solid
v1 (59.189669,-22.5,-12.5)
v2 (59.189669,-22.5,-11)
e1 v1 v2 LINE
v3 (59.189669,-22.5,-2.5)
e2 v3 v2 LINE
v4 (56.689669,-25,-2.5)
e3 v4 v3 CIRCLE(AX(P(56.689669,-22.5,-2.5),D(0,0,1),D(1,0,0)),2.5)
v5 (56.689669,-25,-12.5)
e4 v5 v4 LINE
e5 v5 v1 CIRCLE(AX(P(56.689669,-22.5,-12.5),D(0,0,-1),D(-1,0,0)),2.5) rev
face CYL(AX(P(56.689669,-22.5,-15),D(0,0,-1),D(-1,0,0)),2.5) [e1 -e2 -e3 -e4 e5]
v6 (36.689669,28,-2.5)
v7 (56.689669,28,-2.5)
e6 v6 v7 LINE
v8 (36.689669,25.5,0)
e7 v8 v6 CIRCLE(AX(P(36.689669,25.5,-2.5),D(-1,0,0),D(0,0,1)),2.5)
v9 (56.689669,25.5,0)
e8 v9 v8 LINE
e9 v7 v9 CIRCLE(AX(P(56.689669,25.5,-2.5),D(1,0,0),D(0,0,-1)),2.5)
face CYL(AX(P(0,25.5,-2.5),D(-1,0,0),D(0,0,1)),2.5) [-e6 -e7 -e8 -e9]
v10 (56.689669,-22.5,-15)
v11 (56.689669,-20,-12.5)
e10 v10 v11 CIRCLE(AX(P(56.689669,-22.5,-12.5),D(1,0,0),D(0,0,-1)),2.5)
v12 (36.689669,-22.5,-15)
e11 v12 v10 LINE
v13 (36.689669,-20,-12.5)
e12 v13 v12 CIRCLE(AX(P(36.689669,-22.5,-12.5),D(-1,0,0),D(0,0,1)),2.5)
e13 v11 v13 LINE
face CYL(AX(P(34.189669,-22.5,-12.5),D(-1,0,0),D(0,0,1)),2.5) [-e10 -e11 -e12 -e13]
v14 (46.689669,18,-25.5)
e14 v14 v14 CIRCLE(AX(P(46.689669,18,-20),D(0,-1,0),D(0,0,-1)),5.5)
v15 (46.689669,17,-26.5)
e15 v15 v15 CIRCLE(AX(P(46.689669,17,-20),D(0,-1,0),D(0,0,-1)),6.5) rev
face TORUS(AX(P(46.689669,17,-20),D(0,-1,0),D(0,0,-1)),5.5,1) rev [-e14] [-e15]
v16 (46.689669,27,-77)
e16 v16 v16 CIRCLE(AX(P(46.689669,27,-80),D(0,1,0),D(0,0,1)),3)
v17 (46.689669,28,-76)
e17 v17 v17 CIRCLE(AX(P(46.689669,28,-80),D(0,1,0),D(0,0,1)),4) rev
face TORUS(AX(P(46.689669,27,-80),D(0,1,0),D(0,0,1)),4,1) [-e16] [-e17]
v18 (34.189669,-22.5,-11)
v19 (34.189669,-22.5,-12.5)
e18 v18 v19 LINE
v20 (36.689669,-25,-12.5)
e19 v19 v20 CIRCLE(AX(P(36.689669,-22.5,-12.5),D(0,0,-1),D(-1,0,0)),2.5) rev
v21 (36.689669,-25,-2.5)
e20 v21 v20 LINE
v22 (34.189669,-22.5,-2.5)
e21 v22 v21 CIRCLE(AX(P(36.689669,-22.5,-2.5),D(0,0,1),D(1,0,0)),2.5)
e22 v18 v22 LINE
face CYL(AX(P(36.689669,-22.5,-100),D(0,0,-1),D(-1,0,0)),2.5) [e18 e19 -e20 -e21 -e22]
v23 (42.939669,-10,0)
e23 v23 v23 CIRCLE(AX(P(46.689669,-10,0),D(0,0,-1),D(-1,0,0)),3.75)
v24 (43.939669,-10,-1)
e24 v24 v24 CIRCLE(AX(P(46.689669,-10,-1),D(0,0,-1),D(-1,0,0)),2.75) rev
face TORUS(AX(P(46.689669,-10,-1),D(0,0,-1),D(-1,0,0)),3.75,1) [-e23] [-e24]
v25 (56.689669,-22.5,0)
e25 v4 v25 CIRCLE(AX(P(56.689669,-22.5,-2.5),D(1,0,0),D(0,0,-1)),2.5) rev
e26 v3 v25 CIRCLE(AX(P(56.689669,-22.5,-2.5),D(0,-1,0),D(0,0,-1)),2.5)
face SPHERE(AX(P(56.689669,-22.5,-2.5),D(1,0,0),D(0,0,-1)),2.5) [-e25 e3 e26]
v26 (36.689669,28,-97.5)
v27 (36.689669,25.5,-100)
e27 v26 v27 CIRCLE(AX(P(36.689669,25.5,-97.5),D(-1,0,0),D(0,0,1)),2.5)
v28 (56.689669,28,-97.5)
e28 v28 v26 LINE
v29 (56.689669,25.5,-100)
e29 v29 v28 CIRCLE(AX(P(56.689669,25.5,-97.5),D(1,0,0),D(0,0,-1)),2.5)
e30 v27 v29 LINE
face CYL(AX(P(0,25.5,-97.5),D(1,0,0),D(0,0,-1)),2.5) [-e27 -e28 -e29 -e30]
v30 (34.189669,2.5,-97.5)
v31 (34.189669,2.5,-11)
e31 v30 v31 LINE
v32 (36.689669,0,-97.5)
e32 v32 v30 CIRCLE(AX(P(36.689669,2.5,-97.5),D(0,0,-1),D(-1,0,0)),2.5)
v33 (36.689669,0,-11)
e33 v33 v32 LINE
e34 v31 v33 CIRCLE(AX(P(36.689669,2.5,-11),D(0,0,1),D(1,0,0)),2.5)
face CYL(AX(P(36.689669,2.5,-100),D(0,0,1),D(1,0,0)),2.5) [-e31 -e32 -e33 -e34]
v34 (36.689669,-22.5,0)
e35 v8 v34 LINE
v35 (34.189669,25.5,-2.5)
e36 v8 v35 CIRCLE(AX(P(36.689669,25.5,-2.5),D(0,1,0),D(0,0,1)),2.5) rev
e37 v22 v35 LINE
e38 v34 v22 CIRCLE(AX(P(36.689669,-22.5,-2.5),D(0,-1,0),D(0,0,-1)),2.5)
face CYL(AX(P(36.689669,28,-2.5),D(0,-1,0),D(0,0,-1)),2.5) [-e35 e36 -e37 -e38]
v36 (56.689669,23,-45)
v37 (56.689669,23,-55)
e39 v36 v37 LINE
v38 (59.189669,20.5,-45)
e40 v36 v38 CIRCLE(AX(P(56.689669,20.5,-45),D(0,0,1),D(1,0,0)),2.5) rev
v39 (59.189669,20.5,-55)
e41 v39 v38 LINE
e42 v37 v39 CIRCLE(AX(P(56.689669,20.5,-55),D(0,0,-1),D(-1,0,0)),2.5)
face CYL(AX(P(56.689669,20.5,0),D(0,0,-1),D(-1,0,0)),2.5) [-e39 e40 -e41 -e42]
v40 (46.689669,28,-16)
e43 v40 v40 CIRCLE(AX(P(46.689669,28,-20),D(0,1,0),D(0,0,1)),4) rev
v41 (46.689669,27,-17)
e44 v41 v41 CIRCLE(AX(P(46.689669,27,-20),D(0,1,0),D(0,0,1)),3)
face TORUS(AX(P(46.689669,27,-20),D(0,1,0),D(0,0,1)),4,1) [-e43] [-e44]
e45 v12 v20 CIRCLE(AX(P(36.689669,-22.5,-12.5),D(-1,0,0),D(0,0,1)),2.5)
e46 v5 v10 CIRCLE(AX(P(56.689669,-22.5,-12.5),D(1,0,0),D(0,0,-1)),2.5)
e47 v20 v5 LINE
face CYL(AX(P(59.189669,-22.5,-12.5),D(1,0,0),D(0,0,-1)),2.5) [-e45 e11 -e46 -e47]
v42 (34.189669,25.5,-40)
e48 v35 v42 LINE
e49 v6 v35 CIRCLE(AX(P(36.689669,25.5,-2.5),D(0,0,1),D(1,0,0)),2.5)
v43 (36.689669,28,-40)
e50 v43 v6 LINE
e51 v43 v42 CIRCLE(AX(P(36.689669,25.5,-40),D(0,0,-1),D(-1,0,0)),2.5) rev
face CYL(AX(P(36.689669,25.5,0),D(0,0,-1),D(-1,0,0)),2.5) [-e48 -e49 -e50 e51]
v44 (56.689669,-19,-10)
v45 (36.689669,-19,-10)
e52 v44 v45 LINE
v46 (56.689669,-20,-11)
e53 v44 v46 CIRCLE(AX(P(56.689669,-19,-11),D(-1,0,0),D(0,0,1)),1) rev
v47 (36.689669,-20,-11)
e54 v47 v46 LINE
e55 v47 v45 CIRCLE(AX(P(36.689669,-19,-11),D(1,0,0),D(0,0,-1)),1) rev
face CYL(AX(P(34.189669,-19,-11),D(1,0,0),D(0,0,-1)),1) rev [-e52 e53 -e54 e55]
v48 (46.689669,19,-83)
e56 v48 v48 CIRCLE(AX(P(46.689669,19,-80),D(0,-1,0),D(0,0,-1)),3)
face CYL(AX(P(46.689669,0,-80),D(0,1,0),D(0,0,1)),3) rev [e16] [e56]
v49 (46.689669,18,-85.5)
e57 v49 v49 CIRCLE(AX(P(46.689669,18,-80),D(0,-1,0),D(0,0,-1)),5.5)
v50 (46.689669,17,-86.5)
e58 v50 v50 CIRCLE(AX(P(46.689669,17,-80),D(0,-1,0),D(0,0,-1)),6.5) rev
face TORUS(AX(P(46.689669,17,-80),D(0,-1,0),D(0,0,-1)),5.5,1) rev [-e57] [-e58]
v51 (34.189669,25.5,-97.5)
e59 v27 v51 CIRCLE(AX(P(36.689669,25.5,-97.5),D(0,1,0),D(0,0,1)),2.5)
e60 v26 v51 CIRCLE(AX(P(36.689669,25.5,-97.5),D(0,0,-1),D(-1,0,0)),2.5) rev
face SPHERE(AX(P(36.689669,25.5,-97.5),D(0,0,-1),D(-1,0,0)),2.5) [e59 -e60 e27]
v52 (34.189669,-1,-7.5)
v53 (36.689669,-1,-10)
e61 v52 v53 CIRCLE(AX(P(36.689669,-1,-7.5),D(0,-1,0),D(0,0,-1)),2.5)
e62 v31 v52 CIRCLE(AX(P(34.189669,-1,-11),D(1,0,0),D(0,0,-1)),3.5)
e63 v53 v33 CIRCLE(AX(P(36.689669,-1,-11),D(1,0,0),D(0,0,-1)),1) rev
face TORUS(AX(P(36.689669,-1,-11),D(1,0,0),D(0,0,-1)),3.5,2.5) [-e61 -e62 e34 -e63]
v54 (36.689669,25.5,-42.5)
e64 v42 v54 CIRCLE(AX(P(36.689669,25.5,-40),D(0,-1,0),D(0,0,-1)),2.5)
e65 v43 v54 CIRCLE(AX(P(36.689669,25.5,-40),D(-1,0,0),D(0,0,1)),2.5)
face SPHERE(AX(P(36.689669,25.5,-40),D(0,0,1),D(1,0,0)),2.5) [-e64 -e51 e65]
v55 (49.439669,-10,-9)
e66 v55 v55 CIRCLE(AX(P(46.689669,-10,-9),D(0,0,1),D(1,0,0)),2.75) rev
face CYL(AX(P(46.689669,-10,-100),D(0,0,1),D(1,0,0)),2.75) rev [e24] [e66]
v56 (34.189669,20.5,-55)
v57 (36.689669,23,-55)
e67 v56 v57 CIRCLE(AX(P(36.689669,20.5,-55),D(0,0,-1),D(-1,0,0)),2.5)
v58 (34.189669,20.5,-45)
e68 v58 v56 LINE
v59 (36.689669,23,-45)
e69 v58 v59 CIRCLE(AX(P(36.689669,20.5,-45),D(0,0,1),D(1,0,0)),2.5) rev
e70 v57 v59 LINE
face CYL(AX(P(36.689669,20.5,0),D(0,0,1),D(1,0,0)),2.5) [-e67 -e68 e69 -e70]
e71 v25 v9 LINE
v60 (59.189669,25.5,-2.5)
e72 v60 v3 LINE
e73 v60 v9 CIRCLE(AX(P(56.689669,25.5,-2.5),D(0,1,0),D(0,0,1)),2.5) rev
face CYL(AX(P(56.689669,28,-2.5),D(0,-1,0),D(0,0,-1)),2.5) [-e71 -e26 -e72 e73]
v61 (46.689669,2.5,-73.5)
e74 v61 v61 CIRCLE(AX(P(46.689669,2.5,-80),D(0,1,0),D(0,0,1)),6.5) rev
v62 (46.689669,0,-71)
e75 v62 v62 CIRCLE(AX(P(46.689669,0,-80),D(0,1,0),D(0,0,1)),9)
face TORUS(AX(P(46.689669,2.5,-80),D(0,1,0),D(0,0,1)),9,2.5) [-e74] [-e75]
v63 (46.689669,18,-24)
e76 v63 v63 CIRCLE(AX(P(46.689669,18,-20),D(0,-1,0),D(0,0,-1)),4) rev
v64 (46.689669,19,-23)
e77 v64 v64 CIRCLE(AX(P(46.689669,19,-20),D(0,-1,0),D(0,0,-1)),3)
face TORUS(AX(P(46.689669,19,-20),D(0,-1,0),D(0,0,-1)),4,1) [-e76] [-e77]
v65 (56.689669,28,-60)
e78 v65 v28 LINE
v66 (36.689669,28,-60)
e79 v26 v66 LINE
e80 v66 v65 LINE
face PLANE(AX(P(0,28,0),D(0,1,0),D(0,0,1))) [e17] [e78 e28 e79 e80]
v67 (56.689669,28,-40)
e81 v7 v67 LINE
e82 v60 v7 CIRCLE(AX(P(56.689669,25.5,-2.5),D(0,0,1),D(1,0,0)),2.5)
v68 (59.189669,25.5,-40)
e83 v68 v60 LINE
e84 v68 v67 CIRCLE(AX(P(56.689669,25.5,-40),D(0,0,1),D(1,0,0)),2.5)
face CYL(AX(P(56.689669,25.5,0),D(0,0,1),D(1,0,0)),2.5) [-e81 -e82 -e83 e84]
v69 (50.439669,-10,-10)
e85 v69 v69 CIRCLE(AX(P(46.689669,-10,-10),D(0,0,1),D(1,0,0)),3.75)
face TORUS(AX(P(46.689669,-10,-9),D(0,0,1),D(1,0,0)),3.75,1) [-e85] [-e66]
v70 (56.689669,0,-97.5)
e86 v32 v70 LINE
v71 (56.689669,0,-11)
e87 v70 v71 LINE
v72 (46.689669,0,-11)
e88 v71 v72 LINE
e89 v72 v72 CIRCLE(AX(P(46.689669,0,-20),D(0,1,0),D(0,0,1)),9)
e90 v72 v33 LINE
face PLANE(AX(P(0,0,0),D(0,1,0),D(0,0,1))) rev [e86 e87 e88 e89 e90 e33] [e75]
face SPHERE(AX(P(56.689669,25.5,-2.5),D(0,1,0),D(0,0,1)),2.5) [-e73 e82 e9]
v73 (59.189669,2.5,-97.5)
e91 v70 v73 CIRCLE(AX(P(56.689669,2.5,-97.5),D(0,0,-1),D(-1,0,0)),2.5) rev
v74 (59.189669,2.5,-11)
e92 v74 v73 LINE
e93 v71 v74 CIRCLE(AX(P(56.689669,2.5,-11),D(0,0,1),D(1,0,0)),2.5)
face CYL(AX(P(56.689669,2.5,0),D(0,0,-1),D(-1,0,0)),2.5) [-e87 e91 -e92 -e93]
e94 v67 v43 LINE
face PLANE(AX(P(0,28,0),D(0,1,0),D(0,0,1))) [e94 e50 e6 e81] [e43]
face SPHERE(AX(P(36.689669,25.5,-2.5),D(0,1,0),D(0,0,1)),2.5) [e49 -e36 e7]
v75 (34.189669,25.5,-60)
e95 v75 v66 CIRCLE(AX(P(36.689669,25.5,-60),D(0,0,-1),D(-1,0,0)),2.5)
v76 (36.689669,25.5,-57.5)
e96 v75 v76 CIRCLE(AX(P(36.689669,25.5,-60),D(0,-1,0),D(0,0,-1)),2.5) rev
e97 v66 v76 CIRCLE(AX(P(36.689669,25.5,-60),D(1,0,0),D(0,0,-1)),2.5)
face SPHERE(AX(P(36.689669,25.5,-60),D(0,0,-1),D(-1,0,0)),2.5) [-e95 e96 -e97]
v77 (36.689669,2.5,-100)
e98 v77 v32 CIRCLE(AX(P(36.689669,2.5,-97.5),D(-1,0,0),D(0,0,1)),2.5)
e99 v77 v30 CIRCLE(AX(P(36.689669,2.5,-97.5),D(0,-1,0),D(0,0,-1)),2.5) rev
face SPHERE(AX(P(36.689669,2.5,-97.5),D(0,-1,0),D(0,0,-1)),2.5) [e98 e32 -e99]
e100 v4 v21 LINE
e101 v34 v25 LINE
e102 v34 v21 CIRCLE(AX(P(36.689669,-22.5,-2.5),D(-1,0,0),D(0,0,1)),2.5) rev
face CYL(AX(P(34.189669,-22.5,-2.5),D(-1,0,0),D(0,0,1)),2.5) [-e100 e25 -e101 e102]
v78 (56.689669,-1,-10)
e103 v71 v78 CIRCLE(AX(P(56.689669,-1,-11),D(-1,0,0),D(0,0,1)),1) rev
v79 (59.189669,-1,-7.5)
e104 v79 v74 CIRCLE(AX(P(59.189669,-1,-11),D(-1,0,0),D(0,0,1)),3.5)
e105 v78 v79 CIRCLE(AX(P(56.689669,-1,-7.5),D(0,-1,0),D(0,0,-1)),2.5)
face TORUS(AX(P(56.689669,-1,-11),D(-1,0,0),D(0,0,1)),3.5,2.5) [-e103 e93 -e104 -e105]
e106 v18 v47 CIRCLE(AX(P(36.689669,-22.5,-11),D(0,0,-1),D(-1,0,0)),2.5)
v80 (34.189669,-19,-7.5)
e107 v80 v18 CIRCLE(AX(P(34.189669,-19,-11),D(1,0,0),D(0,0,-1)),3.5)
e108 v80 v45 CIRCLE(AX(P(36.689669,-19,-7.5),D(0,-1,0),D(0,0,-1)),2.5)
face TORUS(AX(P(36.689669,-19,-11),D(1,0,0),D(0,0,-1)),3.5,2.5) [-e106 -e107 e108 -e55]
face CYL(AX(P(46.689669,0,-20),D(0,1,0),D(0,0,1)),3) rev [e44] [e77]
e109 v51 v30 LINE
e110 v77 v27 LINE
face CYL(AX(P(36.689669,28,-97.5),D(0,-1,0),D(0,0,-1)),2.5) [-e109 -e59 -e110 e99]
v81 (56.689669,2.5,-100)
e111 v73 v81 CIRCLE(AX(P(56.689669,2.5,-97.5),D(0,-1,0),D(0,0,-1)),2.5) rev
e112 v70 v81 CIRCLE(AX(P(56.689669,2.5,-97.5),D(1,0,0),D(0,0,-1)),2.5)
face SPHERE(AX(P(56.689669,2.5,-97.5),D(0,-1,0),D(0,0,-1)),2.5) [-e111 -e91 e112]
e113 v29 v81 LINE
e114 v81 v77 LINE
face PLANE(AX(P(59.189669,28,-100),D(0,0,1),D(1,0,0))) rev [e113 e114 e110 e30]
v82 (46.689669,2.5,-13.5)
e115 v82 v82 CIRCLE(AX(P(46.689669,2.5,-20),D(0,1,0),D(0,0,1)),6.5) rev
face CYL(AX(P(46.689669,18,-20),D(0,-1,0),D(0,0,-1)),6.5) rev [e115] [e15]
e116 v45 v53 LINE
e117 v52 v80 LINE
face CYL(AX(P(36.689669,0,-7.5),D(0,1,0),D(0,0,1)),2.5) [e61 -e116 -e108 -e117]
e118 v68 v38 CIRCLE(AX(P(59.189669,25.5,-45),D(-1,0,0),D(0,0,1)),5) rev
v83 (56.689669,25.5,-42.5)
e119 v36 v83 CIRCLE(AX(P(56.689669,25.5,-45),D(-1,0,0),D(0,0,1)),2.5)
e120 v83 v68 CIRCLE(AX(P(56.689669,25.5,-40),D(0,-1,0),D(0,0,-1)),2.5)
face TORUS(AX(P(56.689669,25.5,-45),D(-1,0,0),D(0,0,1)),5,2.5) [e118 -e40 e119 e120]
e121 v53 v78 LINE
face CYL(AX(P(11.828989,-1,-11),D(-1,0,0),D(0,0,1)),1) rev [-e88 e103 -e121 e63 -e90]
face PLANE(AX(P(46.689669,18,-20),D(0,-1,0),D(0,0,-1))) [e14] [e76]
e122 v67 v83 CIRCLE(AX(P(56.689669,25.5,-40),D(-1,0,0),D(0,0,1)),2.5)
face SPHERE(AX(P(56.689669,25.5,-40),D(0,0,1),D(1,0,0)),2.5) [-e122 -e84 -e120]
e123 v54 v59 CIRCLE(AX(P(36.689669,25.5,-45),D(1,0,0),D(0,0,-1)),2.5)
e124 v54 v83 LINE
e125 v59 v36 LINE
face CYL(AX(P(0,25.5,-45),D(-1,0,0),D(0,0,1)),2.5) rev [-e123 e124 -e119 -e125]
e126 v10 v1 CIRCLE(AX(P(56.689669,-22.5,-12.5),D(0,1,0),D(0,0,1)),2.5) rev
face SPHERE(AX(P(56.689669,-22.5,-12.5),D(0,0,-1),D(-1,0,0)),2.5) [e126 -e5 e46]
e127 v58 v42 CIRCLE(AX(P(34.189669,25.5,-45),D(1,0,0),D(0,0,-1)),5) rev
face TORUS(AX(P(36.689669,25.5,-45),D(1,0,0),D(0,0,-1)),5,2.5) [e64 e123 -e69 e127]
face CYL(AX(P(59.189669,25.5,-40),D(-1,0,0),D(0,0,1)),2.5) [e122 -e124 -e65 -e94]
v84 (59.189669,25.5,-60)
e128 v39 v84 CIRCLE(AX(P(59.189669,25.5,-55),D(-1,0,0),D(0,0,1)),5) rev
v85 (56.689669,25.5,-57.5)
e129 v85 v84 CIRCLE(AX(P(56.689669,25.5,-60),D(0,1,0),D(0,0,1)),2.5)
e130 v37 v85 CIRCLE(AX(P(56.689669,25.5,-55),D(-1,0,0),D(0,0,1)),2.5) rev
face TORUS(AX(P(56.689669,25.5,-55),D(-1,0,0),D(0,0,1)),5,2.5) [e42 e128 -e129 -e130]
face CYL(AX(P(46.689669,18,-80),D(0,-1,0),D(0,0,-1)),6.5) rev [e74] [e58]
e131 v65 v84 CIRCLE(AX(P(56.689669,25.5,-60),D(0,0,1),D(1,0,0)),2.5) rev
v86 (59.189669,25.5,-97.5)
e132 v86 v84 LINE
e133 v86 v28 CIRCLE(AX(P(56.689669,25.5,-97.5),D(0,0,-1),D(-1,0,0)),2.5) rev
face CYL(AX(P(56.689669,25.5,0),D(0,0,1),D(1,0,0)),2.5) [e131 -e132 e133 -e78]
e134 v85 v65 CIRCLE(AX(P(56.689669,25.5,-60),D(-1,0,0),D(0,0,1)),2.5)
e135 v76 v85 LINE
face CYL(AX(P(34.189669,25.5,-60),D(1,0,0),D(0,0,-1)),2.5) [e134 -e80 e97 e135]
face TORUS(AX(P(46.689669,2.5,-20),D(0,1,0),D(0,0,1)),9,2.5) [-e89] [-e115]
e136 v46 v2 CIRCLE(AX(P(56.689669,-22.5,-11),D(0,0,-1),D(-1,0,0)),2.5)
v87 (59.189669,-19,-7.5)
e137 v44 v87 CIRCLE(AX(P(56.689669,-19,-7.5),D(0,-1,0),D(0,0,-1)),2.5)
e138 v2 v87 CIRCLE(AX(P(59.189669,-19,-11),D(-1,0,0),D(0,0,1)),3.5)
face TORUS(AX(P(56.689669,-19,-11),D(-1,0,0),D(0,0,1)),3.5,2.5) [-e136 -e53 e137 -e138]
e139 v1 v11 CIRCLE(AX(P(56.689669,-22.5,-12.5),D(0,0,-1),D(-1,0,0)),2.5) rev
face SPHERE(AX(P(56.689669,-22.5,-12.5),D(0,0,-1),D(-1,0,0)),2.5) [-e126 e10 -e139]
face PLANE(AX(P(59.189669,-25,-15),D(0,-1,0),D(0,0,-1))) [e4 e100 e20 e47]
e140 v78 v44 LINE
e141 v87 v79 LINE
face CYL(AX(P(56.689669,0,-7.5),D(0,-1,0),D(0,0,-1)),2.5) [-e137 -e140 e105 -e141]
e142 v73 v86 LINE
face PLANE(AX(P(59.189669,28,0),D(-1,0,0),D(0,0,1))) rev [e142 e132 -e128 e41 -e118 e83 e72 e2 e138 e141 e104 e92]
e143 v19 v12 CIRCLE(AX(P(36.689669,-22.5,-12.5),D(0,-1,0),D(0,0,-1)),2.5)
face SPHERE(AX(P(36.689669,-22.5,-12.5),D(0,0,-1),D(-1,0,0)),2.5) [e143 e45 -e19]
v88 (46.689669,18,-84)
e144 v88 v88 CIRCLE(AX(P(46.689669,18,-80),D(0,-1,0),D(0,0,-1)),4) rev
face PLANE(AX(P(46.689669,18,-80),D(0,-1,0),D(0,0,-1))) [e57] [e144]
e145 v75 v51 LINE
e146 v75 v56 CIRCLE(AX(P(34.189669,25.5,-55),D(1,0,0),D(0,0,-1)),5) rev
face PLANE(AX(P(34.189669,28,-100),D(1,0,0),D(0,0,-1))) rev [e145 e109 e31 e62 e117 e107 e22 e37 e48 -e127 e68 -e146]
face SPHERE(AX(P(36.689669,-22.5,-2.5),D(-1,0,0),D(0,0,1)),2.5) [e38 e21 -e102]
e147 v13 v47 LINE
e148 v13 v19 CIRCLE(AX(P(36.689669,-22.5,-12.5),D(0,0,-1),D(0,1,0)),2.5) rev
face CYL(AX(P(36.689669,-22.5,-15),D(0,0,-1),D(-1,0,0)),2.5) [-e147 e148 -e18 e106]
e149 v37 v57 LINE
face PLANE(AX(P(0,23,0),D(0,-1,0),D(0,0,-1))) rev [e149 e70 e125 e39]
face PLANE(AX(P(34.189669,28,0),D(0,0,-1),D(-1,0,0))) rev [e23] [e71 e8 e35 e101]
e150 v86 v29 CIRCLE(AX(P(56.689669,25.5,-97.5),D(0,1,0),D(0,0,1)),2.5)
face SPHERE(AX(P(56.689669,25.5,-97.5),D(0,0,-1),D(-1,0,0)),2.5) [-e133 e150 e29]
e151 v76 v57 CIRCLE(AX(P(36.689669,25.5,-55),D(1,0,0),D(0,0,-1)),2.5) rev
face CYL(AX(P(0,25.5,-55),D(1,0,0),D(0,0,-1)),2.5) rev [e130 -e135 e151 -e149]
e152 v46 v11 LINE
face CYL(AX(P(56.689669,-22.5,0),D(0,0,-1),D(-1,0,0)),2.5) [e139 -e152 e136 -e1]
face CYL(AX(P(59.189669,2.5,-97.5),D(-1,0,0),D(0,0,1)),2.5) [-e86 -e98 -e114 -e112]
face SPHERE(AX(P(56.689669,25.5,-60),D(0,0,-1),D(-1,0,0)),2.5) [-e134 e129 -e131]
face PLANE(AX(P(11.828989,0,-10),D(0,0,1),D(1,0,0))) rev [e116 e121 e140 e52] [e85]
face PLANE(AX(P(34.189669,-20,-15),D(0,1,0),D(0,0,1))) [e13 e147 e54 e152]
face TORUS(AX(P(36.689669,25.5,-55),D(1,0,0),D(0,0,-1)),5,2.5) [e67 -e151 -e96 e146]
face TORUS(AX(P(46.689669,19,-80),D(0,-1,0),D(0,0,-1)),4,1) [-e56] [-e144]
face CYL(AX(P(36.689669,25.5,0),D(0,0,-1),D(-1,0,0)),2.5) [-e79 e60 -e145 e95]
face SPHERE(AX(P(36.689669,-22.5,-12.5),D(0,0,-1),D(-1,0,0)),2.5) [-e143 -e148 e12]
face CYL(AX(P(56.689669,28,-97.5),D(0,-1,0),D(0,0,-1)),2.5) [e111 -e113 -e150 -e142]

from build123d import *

# Parameters (mm, degrees)
SKETCH_1_W          = 25
SKETCH_1_H          = 100
EXTRUDE_1_DEPTH     = 28
SKETCH_2_R          = 3
CUT_EXTRUDE_1_DEPTH = 120.529983158
SKETCH_3_W          = 10
SKETCH_3_H          = 20
EXTRUDE_2_DEPTH     = 25
SKETCH_4_R          = 2.75
CUT_EXTRUDE_2_DEPTH = 120.529983158
SKETCH_5_W          = 25
SKETCH_5_H          = 5
EXTRUDE_3_DEPTH     = 15
SKETCH_6_R          = 6.5
CUT_EXTRUDE_3_DEPTH = 18
FILLET_1_R          = 1
FILLET_2_R          = 2.5
CUT_EXTRUDE_4_DEPTH = 5
FILLET_3_R          = 2.5


with BuildPart() as part:
    # 草图1 → 凸台-拉伸1 (new body)
    with BuildSketch(Plane(origin=(0, 0, 0), x_dir=(1, 0, 0), z_dir=(0, 1, 0))):
        with Locations((46.68966864, 50)):
            Rectangle(SKETCH_1_W, SKETCH_1_H)
    extrude(amount=EXTRUDE_1_DEPTH)

    # 草图2 → 切除-拉伸1 (cut, through all)
    with BuildSketch(Plane(origin=(0, 28, 0), x_dir=(1, 0, 0), z_dir=(0, 1, 0))):
        with Locations(Location((46.68966864, 80, 0), (0, 0, 270))):
            Circle(SKETCH_2_R)
        with Locations(Location((46.68966864, 20, 0), (0, 0, 270))):
            Circle(SKETCH_2_R)
    extrude(amount=-CUT_EXTRUDE_1_DEPTH, mode=Mode.SUBTRACT)

    # 草图3 → 凸台-拉伸2 (add)
    with BuildSketch(Plane(origin=(59.18966864, 0, 0), x_dir=(0, 0, -1), z_dir=(1, 0, 0))):
        with Locations((5, -10)):
            Rectangle(SKETCH_3_W, SKETCH_3_H)
    extrude(amount=-EXTRUDE_2_DEPTH)

    # 草图4 → 切除-拉伸2 (cut, through all)
    with BuildSketch(Plane.XY):
        with Locations((46.68966864, -10)):
            Circle(SKETCH_4_R)
    extrude(amount=-CUT_EXTRUDE_2_DEPTH, mode=Mode.SUBTRACT)

    # 草图5 → 凸台-拉伸3 (add)
    with BuildSketch(Plane.XY):
        with Locations((46.68966864, -22.5)):
            Rectangle(SKETCH_5_W, SKETCH_5_H)
    extrude(amount=-EXTRUDE_3_DEPTH)

    # 草图6 → 切除-拉伸3 (cut)
    with BuildSketch(Plane.XZ):
        with Locations(Location((46.68966864, -20, 0), (0, 0, 270))):
            Circle(SKETCH_6_R)
        with Locations(Location((46.68966864, -80, 0), (0, 0, 270))):
            Circle(SKETCH_6_R)
    extrude(amount=-CUT_EXTRUDE_3_DEPTH, mode=Mode.SUBTRACT)

    # 圆角1
    fillet_1_edges = [part.edges().sort_by_distance(p)[0] for p in [
        (46.68966864, 28, -83),
        (46.68966864, 28, -23),
        (46.68966864, -20, -10),
        (46.68966864, 0, -10),
        (43.93966864, -10, -10),
        (43.93966864, -10, 0),
        (46.68966864, 18, -13.5),
        (46.68966864, 18, -23),
        (46.68966864, 18, -73.5),
        (46.68966864, 18, -83),
    ]]
    fillet(fillet_1_edges, radius=FILLET_1_R)

    # 圆角2
    fillet_2_edges = [part.edges().sort_by_distance(p)[0] for p in [
        (59.18966864, 28, -50),
        (46.68966864, 28, -100),
        (34.18966864, -22.5, -15),
        (34.18966864, -25, -7.5),
        (34.18966864, -20, -13),
        (46.68966864, -20, -15),
        (34.18966864, 28, -50),
        (46.68966864, 0, -100),
        (59.18966864, -22.5, -15),
        (59.18966864, -20, -13),
        (46.68966864, -25, -15),
        (59.18966864, -25, -7.5),
        (46.68966864, -25, 0),
        (34.18966864, 0, -55.5),
        (46.68966864, 0, -13.5),
        (46.68966864, 0, -73.5),
        (34.18966864, -10, -10),
        (59.18966864, -10, -10),
        (34.18966864, 14, -100),
        (59.18966864, 14, -100),
        (59.18966864, 1.5, 0),
        (34.18966864, 1.5, 0),
        (46.68966864, 28, 0),
        (59.18966864, 0, -55.5),
        (59.18966864, -19.707106781, -10.292893219),
        (34.18966864, -19.707106781, -10.292893219),
        (59.18966864, -0.292893219, -10.292893219),
        (34.18966864, -0.292893219, -10.292893219),
    ]]
    fillet(fillet_2_edges, radius=FILLET_2_R - 0.0001)  # a hair under: the kernel refuses the full size

    # 草图7 → 切除-拉伸4 (cut)
    with BuildSketch(Plane(origin=(0, 28, 0), x_dir=(1, 0, 0), z_dir=(0, 1, 0))):
        Polygon((34.18966864, 50), (34.18966864, 57.5), (59.18966864, 57.5), (59.18966864, 42.5), (34.18966864, 42.5), align=None)
    extrude(amount=-CUT_EXTRUDE_4_DEPTH, mode=Mode.SUBTRACT)

    # 圆角3
    fillet_3_edges = [part.edges().sort_by_distance(p)[0] for p in [
        (46.68966864, 28, -57.5),
        (46.68966864, 28, -42.5),
        (58.457464883, 27.267796242, -57.5),
        (34.921872398, 27.267796242, -57.5),
        (58.457464883, 27.267796242, -42.5),
        (34.921872398, 27.267796242, -42.5),
        (46.68966864, 23, -57.5),
        (59.18966864, 23, -50),
        (46.68966864, 23, -42.5),
        (34.18966864, 23, -50),
    ]]
    fillet(fillet_3_edges, radius=FILLET_3_R - 0.0001)  # a hair under: the kernel refuses the full size


solid = part.part
